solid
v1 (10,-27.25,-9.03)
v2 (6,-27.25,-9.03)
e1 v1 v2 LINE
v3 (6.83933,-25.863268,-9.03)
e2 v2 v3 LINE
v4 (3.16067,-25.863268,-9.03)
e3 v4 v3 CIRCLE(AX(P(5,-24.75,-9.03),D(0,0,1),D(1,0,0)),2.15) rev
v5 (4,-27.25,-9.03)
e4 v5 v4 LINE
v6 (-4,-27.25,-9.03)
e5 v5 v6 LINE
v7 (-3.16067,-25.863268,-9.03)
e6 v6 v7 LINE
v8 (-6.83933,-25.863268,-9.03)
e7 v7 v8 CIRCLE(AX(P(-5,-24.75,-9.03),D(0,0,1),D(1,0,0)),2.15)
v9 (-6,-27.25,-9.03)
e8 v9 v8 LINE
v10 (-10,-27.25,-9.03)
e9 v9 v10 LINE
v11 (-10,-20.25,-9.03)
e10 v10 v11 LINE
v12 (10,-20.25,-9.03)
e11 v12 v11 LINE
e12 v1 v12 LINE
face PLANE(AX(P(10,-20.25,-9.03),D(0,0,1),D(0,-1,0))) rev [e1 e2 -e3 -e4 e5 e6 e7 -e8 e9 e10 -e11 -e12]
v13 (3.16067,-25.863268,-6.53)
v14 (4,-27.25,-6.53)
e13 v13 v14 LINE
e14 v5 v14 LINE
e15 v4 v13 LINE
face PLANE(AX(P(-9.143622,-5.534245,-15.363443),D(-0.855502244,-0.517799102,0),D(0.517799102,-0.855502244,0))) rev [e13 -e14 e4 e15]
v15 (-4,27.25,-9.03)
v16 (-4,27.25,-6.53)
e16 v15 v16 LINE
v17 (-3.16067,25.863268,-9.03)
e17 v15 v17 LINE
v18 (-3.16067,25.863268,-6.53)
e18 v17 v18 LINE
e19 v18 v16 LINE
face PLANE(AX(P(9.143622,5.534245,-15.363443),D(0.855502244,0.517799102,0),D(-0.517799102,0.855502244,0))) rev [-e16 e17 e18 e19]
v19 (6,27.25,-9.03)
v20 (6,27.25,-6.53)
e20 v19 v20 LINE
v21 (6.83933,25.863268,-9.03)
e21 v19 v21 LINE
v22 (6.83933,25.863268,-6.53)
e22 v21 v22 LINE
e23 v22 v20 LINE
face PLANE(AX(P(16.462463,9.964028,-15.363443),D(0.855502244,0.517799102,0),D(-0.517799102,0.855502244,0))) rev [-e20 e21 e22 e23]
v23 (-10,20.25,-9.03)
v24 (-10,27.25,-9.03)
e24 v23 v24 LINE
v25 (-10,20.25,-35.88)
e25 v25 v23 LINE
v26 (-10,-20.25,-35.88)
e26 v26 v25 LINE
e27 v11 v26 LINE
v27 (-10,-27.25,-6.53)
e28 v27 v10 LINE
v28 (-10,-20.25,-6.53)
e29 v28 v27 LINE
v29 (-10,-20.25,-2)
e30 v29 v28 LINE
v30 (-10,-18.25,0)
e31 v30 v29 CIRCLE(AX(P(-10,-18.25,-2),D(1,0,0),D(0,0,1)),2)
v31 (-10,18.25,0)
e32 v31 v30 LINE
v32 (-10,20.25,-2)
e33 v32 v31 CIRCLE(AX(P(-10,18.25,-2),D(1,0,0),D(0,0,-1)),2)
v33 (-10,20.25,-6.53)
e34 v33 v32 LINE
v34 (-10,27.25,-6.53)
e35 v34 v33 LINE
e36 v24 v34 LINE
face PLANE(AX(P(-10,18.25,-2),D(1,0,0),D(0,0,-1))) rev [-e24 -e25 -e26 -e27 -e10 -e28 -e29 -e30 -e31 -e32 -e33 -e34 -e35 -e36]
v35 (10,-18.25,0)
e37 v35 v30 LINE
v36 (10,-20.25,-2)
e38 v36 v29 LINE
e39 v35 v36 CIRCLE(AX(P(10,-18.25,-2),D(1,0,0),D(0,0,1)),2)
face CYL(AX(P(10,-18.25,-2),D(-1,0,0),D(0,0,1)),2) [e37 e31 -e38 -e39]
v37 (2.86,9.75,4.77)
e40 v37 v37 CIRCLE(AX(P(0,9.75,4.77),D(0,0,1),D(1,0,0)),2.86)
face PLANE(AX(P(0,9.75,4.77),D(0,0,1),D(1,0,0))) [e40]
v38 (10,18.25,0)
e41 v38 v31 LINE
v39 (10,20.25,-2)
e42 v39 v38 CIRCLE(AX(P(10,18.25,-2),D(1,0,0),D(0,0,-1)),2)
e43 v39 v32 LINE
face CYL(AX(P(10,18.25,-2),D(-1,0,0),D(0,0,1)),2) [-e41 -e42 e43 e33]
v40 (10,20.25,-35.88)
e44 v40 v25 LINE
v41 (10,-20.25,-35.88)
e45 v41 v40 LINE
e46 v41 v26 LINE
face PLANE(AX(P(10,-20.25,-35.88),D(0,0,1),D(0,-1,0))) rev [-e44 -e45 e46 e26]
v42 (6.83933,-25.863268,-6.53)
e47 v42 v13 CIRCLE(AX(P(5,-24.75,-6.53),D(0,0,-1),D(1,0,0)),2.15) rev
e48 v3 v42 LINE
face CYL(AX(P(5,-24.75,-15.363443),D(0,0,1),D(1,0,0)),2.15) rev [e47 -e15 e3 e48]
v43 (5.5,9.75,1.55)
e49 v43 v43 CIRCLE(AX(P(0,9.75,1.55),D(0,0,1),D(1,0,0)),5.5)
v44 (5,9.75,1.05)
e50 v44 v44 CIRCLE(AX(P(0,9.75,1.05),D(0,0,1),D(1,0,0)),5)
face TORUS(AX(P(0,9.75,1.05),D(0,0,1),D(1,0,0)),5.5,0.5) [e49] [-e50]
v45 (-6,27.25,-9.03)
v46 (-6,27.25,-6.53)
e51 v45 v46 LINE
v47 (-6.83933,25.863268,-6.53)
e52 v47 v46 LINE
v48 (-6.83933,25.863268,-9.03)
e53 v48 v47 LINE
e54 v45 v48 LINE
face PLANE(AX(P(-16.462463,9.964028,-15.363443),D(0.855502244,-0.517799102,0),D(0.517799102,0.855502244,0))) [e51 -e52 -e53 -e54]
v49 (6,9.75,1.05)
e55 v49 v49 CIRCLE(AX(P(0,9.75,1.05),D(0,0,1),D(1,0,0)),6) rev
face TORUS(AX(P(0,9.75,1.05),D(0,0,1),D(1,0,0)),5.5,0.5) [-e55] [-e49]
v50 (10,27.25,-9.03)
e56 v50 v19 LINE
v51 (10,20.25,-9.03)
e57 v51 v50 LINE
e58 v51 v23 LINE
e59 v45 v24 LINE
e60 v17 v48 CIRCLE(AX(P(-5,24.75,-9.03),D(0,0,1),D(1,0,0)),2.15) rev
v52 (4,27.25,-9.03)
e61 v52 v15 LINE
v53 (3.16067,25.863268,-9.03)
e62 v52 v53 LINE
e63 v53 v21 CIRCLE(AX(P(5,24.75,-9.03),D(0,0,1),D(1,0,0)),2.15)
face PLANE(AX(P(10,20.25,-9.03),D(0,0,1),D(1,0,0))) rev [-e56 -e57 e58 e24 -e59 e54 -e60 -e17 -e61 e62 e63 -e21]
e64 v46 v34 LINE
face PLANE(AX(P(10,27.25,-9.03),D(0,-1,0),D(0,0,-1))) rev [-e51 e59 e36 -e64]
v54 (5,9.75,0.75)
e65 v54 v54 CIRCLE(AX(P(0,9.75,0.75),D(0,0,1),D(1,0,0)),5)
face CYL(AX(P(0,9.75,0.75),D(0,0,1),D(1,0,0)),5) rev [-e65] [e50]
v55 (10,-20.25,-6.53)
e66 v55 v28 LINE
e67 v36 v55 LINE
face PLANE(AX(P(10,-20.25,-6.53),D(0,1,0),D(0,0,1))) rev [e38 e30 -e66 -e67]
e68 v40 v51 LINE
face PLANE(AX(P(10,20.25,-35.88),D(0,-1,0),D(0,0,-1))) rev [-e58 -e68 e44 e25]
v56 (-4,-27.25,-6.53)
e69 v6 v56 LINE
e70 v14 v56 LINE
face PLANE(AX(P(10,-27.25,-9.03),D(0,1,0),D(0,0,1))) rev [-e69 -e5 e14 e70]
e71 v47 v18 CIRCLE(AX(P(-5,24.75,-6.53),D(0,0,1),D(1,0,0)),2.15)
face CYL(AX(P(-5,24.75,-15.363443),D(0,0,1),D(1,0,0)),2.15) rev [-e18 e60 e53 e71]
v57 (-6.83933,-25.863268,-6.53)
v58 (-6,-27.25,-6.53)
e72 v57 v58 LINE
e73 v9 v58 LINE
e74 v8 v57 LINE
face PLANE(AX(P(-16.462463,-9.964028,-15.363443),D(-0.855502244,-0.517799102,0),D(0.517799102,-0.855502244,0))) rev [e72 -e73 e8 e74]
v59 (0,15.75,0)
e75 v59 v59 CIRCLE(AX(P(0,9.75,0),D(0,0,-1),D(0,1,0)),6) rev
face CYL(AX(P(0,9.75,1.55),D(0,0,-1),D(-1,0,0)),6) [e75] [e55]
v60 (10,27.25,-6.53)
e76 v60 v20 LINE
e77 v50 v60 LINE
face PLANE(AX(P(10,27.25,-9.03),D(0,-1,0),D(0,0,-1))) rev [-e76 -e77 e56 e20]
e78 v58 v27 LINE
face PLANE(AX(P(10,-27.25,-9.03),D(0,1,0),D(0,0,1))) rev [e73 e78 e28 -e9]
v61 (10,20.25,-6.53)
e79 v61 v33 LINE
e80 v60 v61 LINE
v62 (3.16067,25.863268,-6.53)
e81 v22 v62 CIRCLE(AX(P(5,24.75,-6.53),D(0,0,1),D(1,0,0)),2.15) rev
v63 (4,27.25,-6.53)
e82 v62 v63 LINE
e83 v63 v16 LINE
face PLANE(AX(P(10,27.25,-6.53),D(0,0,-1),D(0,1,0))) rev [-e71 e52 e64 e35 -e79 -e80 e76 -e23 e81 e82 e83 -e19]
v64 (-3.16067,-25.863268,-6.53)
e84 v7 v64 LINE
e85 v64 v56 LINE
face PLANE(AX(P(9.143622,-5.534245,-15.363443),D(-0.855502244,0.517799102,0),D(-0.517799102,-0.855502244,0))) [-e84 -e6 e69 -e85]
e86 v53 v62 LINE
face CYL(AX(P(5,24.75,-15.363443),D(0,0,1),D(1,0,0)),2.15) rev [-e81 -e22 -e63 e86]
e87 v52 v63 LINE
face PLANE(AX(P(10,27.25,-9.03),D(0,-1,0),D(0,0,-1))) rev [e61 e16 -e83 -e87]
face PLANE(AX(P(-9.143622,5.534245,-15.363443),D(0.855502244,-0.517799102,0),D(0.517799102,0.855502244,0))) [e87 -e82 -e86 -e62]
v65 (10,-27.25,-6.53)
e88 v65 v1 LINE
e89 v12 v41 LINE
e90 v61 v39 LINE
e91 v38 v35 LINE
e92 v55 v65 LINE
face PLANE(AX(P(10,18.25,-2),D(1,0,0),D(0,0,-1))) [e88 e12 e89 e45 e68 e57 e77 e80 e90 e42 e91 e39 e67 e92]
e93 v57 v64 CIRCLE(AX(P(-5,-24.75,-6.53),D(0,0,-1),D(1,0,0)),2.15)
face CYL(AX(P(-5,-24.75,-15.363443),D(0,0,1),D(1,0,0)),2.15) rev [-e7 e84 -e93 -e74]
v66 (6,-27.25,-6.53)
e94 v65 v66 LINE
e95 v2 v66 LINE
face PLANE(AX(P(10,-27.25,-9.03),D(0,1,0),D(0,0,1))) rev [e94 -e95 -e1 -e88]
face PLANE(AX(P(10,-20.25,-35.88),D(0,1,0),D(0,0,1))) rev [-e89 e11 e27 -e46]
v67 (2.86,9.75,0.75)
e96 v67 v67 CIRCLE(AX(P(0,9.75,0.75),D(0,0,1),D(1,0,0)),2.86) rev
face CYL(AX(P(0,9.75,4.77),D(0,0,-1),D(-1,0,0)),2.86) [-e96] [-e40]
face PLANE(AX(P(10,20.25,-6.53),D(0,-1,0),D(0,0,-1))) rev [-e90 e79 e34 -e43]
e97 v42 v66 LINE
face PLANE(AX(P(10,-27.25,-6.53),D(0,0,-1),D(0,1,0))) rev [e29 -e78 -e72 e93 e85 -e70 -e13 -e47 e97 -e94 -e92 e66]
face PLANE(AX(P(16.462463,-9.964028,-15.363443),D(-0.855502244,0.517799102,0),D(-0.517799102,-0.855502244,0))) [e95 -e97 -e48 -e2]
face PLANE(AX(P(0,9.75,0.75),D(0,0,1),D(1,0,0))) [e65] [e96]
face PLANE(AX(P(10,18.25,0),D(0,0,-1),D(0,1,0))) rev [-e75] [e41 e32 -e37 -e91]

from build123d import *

# Parameters (mm, degrees)
BOSS_EXTRUDE1_DEPTH = 10
SKETCH3_R           = 2.15
CUT_EXTRUDE2_DEPTH  = 2.5
SKETCH2_R           = 6
BOSS_EXTRUDE2_DEPTH = 1.55
CUT_EXTRUDE1_START  = 1.55
CUT_EXTRUDE1_DEPTH  = 0.8
SKETCH2_4_R         = 2.86
BOSS_EXTRUDE3_DEPTH = 4.77
FILLET1_R           = 0.5


with BuildPart() as part:
    # Sketch1 → Boss-Extrude1 (new, symmetric)
    with BuildSketch(Plane(origin=(0, 0, 0), x_dir=(0, 0, -1), z_dir=(1, 0, 0))):
        with BuildLine():
            Line((35.88, -20.25), (35.88, 20.25))
            Line((35.88, 20.25), (9.03, 20.25))
            Line((9.03, 20.25), (9.03, 27.25))
            Line((9.03, 27.25), (6.53, 27.25))
            Line((6.53, 27.25), (6.53, 20.25))
            Line((6.53, 20.25), (2, 20.25))
            ThreePointArc((2, 20.25), (0.585786438, 19.664213562), (0, 18.25))
            Line((0, 18.25), (0, -18.25))
            ThreePointArc((0, -18.25), (0.585786438, -19.664213562), (2, -20.25))
            Line((2, -20.25), (6.53, -20.25))
            Line((6.53, -20.25), (6.53, -27.25))
            Line((6.53, -27.25), (9.03, -27.25))
            Line((9.03, -27.25), (9.03, -20.25))
            Line((9.03, -20.25), (35.88, -20.25))
        make_face()
    extrude(amount=BOSS_EXTRUDE1_DEPTH, both=True)

    # Sketch3 → Cut-Extrude2 (cut)
    with BuildSketch(Plane.XY.offset(-6.53)):
        with Locations((-5, 24.75)):
            Circle(SKETCH3_R)
        with BuildLine():
            Line((-6, 27.25), (-6.839329825, 25.86326807))
            ThreePointArc((-6.839329825, 25.86326807), (-5, 26.9), (-3.160670175, 25.86326807))
            Line((-3.160670175, 25.86326807), (-4, 27.25))
            Line((-4, 27.25), (-6, 27.25))
        make_face()
        with Locations((5, 24.75)):
            Circle(SKETCH3_R)
        with BuildLine():
            Line((6, 27.25), (4, 27.25))
            Line((4, 27.25), (3.160670175, 25.86326807))
            ThreePointArc((3.160670175, 25.86326807), (5, 26.9), (6.839329825, 25.86326807))
            Line((6.839329825, 25.86326807), (6, 27.25))
        make_face()
    cut_extrude2 = extrude(amount=-CUT_EXTRUDE2_DEPTH, mode=Mode.SUBTRACT)

    # Sketch2 → Boss-Extrude2 (add)
    with BuildSketch(Plane.XY):
        with Locations(Location((0, 9.75, 0), (0, 0, 90))):
            Circle(SKETCH2_R)
    extrude(amount=BOSS_EXTRUDE2_DEPTH)

    # Sketch2<3> → Cut-Extrude1 (cut)
    with BuildSketch(Plane.XY.offset(CUT_EXTRUDE1_START)):
        with BuildLine():
            ThreePointArc((-2.86, 9.75), (0, 12.61), (2.86, 9.75))
            Line((2.86, 9.75), (5, 9.75))
            ThreePointArc((5, 9.75), (0, 14.75), (-5, 9.75))
            Line((-5, 9.75), (-2.86, 9.75))
        make_face()
        with BuildLine():
            Line((5, 9.75), (2.86, 9.75))
            ThreePointArc((2.86, 9.75), (0, 6.89), (-2.86, 9.75))
            Line((-2.86, 9.75), (-5, 9.75))
            ThreePointArc((-5, 9.75), (0, 4.75), (5, 9.75))
        make_face()
        with BuildLine():
            ThreePointArc((-2.86, 9.75), (0, 6.89), (2.86, 9.75))
            Line((2.86, 9.75), (-2.86, 9.75))
        make_face()
        with BuildLine():
            Line((-2.86, 9.75), (2.86, 9.75))
            ThreePointArc((2.86, 9.75), (0, 12.61), (-2.86, 9.75))
        make_face()
    extrude(amount=-CUT_EXTRUDE1_DEPTH, mode=Mode.SUBTRACT)

    # Sketch2<4> → Boss-Extrude3 (add)
    with BuildSketch(Plane.XY):
        with Locations((0, 9.75)):
            Circle(SKETCH2_4_R)
    extrude(amount=BOSS_EXTRUDE3_DEPTH)

    # Mirror1: Cut-Extrude2 across plane
    add(cut_extrude2.mirror(Plane.ZX), mode=Mode.SUBTRACT)

    # Fillet1
    fillet1_edges = [part.edges().sort_by_distance(p)[0] for p in [
        (0, 3.75, 1.55),
        (5, 9.75, 1.55),
    ]]
    fillet(fillet1_edges, radius=FILLET1_R - 0.0001)  # a hair under: the kernel refuses the full size


solid = part.part
